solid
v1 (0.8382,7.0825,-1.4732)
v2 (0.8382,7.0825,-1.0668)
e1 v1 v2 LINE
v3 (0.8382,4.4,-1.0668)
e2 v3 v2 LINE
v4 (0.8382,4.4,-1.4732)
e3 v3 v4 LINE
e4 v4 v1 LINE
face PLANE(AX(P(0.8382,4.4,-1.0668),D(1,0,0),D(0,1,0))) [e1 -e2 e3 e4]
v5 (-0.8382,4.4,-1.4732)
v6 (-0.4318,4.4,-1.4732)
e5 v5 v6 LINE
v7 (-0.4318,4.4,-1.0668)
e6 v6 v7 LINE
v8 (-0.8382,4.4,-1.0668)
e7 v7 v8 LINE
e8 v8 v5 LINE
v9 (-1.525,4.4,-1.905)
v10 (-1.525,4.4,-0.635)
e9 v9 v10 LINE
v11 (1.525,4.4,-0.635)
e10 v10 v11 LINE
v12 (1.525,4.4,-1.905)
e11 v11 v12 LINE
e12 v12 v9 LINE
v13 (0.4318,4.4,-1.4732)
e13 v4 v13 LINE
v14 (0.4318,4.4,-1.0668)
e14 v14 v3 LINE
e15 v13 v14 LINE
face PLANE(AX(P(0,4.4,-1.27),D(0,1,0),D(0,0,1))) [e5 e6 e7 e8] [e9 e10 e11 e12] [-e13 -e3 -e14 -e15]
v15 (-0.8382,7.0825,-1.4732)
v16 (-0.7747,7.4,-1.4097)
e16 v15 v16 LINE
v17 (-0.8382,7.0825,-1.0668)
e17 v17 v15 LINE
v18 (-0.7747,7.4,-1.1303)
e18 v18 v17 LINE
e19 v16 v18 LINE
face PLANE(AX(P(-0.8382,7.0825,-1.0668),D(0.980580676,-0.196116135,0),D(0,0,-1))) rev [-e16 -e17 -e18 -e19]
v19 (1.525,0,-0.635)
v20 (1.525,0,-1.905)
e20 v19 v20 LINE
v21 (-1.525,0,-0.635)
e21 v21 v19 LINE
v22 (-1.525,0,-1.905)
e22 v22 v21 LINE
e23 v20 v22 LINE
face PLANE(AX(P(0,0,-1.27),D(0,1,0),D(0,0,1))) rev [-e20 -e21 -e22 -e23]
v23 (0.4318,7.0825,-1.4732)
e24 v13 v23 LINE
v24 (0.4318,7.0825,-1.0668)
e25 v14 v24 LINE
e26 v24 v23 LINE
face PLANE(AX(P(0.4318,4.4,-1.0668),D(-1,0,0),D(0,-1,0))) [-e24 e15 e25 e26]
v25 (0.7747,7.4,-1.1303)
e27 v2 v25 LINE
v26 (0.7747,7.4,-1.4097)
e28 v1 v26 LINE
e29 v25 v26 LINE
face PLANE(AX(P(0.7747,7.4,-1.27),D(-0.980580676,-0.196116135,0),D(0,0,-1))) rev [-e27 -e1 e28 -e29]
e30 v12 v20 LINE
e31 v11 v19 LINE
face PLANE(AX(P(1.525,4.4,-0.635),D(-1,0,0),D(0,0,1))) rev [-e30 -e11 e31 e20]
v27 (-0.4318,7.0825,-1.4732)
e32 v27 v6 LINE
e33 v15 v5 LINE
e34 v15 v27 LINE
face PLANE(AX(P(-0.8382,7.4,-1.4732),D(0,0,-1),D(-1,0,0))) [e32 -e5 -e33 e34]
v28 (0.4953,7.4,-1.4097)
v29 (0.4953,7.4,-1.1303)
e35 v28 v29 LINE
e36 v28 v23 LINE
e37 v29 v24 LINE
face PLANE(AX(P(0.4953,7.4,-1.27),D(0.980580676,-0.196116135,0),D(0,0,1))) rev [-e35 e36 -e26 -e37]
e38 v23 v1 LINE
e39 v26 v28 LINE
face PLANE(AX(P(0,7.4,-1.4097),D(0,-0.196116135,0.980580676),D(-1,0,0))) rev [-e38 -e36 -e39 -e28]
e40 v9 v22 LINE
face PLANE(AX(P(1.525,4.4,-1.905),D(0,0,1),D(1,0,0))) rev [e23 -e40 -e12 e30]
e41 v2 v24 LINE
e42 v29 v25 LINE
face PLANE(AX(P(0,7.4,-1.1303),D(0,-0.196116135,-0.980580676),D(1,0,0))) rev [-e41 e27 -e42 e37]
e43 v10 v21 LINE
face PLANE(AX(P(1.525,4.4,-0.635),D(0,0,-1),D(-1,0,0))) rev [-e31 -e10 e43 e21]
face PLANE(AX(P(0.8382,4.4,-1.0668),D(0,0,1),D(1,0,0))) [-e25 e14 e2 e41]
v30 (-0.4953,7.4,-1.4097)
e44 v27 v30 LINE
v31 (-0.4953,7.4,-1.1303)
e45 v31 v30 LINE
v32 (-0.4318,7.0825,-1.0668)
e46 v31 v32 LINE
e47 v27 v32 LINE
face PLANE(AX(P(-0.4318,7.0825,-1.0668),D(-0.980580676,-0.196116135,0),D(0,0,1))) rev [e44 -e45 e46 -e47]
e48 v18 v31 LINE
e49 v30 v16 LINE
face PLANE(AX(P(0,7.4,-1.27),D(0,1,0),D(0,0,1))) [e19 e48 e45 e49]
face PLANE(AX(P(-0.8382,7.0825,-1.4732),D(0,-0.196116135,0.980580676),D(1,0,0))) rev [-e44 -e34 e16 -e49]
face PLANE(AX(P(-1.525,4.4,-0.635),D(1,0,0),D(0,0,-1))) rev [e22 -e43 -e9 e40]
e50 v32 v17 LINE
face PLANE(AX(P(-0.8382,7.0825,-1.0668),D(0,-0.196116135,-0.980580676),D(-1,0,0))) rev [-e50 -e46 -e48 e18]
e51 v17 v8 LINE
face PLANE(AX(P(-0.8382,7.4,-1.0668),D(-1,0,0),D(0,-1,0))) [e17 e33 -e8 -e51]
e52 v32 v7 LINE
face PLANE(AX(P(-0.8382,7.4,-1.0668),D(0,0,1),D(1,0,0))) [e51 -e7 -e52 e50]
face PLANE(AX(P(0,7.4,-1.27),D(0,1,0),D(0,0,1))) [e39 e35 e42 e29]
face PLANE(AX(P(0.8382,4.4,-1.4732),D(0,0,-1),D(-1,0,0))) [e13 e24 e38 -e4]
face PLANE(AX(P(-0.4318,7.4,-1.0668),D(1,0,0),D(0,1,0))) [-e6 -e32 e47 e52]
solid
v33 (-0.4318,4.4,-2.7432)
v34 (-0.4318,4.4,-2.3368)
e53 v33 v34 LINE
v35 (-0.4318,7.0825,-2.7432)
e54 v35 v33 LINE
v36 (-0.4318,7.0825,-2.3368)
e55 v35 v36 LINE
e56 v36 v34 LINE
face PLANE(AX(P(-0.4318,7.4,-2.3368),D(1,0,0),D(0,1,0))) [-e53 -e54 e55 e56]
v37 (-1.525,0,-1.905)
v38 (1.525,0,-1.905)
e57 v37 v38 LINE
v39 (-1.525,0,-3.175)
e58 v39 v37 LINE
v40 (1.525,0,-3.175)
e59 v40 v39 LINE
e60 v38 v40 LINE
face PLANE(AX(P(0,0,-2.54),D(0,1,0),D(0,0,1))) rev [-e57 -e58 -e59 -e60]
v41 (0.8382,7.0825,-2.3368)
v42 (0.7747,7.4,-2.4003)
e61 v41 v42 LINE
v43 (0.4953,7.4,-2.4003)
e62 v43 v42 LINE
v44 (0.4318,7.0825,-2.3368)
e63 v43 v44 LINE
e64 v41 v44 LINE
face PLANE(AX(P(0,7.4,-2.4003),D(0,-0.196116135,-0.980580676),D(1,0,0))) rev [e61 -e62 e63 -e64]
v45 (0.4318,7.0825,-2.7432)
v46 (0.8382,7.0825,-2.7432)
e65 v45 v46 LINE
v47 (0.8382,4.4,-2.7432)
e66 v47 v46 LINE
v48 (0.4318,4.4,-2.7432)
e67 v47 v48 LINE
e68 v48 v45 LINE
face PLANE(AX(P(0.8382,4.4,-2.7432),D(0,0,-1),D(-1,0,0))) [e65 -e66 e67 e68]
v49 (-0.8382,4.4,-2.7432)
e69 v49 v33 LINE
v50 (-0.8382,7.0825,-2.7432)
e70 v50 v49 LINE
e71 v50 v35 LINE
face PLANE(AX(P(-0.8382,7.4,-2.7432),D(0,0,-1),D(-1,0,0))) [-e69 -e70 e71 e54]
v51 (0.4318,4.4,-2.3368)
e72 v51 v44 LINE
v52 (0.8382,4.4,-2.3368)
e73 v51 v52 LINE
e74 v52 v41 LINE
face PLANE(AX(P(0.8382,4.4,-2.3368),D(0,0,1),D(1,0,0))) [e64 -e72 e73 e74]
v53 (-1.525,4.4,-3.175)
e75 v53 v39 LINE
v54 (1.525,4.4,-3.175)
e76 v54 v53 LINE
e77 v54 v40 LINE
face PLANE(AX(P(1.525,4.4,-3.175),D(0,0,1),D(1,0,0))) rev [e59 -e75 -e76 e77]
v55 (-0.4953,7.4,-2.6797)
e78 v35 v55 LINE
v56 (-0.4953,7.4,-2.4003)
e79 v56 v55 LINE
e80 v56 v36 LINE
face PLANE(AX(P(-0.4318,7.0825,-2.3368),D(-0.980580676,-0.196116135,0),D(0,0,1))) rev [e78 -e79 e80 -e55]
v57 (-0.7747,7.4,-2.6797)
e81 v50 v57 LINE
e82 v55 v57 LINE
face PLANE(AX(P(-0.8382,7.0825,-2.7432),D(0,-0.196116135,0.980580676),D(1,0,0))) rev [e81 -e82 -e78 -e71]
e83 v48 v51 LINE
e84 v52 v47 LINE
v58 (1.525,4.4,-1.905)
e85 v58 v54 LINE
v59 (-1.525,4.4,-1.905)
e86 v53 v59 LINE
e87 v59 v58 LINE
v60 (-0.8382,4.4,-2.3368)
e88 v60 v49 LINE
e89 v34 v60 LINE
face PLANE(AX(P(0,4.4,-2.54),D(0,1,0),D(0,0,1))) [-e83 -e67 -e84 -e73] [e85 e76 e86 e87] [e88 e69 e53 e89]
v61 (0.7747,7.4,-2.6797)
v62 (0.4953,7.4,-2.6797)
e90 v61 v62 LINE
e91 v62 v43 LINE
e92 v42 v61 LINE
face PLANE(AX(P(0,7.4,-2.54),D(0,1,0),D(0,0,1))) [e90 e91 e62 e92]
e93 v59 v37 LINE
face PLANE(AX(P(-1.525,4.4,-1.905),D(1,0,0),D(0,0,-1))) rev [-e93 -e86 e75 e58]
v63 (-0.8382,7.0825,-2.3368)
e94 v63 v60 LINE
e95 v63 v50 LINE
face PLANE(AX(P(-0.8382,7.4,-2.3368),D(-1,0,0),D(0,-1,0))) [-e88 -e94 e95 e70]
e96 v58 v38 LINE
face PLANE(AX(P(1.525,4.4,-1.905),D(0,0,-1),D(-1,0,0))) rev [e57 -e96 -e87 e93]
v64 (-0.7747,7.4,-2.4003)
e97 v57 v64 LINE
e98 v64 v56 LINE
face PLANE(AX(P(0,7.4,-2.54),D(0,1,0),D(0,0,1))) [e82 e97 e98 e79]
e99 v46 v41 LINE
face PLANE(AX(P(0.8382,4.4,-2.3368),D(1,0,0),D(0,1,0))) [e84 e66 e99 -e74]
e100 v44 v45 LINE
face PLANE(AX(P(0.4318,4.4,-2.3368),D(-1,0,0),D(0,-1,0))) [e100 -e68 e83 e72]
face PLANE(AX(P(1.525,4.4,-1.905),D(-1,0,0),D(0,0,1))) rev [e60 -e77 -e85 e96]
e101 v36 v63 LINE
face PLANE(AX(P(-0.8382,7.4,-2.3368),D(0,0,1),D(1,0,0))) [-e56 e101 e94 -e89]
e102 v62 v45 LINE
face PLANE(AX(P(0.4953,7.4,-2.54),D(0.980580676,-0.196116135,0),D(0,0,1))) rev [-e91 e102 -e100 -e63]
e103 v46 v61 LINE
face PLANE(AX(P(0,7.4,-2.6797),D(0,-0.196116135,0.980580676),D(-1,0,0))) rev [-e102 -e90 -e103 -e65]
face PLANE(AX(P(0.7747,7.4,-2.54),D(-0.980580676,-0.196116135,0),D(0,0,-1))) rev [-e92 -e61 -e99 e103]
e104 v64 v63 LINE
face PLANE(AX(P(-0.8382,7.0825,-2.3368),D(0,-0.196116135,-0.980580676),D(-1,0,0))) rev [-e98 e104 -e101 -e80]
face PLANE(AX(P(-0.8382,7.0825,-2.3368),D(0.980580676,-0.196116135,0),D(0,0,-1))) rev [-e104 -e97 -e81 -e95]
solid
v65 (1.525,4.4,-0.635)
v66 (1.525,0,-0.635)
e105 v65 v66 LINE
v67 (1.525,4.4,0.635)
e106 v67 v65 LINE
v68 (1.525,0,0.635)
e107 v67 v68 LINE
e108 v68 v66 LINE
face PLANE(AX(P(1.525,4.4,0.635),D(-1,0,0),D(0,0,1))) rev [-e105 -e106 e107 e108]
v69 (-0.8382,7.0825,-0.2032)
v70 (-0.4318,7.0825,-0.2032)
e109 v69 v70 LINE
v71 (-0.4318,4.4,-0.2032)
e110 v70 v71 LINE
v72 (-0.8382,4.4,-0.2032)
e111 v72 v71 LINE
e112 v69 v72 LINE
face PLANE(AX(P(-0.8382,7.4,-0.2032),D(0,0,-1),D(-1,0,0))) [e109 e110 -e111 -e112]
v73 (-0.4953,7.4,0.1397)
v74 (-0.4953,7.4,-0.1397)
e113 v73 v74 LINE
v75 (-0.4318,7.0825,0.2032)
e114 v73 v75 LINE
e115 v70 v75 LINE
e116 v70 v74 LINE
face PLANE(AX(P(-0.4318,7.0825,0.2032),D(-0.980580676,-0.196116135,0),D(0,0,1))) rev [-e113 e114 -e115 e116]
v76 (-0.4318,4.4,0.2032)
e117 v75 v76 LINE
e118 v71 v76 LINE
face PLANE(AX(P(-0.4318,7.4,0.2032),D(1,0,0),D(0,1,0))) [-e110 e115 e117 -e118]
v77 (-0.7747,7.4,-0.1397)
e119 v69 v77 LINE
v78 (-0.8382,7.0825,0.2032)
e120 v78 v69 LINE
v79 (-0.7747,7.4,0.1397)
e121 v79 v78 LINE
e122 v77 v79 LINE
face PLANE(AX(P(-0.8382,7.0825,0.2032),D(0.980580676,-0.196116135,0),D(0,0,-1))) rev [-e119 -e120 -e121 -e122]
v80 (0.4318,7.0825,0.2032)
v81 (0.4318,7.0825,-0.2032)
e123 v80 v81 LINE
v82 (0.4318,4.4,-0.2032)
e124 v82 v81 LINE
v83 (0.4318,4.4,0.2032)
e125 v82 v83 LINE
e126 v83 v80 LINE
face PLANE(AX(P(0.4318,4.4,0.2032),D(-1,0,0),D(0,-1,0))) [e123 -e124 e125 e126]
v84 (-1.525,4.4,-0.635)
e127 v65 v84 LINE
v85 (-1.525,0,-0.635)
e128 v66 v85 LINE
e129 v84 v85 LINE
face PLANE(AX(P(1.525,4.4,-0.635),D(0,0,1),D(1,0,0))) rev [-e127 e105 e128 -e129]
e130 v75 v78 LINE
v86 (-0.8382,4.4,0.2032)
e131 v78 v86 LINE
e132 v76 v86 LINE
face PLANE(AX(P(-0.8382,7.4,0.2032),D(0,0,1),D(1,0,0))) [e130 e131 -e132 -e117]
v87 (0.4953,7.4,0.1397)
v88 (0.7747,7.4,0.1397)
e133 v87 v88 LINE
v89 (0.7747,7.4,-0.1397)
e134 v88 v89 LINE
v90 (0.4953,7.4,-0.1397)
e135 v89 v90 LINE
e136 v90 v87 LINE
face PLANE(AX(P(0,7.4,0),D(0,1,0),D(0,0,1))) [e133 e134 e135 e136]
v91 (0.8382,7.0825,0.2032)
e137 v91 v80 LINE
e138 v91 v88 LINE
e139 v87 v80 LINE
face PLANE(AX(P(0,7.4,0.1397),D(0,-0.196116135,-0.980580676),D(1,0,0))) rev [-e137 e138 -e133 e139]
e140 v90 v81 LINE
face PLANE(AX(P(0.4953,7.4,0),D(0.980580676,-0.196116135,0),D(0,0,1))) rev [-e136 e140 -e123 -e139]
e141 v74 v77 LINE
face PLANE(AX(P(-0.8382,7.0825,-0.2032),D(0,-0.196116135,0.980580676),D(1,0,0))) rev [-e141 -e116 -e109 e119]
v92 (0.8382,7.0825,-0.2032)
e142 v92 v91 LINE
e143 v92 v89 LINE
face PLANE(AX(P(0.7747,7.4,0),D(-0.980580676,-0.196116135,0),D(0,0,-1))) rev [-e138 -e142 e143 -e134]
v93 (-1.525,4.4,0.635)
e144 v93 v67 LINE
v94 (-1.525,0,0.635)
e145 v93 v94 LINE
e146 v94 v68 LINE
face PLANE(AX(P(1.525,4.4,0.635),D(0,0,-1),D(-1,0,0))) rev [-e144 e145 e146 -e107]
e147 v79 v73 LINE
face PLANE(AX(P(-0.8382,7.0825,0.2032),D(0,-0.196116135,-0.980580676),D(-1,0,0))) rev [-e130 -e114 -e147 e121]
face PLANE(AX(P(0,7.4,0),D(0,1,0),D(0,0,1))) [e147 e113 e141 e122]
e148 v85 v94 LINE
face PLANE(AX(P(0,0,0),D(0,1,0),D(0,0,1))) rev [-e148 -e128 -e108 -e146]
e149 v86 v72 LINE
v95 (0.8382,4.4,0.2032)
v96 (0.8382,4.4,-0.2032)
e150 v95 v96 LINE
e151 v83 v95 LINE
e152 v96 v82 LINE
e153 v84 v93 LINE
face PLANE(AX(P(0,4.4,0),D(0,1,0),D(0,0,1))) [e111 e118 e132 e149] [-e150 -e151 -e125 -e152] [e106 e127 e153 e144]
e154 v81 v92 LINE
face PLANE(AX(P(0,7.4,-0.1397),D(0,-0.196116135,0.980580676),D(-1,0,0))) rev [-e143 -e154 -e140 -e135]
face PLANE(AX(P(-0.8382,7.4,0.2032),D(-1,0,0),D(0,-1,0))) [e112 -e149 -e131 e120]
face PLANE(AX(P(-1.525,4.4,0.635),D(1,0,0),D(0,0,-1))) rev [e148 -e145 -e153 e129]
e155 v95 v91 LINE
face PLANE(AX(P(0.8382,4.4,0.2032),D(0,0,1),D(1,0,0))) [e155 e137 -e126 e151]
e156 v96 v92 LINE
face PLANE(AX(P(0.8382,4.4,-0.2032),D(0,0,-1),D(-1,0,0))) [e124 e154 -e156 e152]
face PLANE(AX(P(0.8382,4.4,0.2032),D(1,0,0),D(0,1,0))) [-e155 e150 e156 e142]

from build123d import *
from OCP.BRepFilletAPI import BRepFilletAPI_MakeChamfer

# Parameters (mm, degrees)
SKETCH1_W           = 3.05
SKETCH1_H           = 1.27
BOSS_EXTRUDE2_DEPTH = 4.4
SWEEP5_START        = 4.4
SWEEP5_OUTLINE_W    = 0.4064
SWEEP5_OUTLINE_H    = 0.4064
SWEEP5_DEPTH        = 3
SKETCH6_W           = 0.4064
SKETCH6_H           = 0.4064
CHAMFER1_SIZE       = 0.0635
CHAMFER1_SIZE2      = 0.3175
CHAMFER2_SIZE       = 0.3175
CHAMFER2_SIZE2      = 0.0635
LPATTERN1_COUNT     = 3
LPATTERN1_PITCH     = 1.27


# Read off the part's stored shape, not the designer's step: Sweep5
with BuildPart() as part:
    # Sketch1 → Boss-Extrude2 (new body)
    with BuildSketch(Plane(origin=(0, 0, 0), x_dir=(1, 0, 0), z_dir=(0, 1, 0))):
        Rectangle(SKETCH1_W, SKETCH1_H)
    extrude(amount=BOSS_EXTRUDE2_DEPTH)

    # Sweep5 outline → Sweep5 (add)
    with BuildSketch(Plane(origin=(0, 0, 0), x_dir=(1, 0, 0), z_dir=(0, 1, 0)).offset(SWEEP5_START)):
        with Locations((-0.635, 0)):
            Rectangle(SWEEP5_OUTLINE_W, SWEEP5_OUTLINE_H)
    extrude(amount=SWEEP5_DEPTH)

    # Sweep6: sweep along a path in Sketch7
    with BuildLine(Plane.XY) as sweep6_path:
        Line((0.635, 4.4), (0.635, 7.4))
    # Sketch6 → Sweep6 (sweep)
    with BuildSketch(Plane(origin=(0, 7.4, 0), x_dir=(1, 0, 0), z_dir=(0, 1, 0))):
        with Locations((0.635, 0)):
            Rectangle(SKETCH6_W, SKETCH6_H)
    sweep(path=sweep6_path.line)

    # Chamfer1
    chamfer1_edges = [part.edges().sort_by_distance(p)[0] for p in [
        (-0.635, 7.4, -0.2032),
        (-0.4318, 7.4, 0),
        (-0.635, 7.4, 0.2032),
        (-0.8382, 7.4, 0),
    ]]
    chamfer1_side = [part.faces().sort_by_distance(p)[0] for p in [
        (-0.635, 7.4, 0),
    ]]
    chamfer(chamfer1_edges, length=CHAMFER1_SIZE, length2=CHAMFER1_SIZE2, reference=chamfer1_side[0])

    # Chamfer2: one chamfer whose edges measure the first distance from different faces: ONE call of the kernel's chamfer builder (chamfer() names one face for all edges)
    chamfer2_edges_1 = [part.edges().sort_by_distance(p)[0] for p in [
        (0.8382, 7.4, 0),
    ]]
    chamfer2_side_1 = [part.faces().sort_by_distance(p)[0] for p in [
        (0.8382, 5.9, 0),
    ]]
    chamfer2_edges_2 = [part.edges().sort_by_distance(p)[0] for p in [
        (0.635, 7.4, -0.2032),
    ]]
    chamfer2_side_2 = [part.faces().sort_by_distance(p)[0] for p in [
        (0.635, 5.9, -0.2032),
    ]]
    chamfer2_edges_3 = [part.edges().sort_by_distance(p)[0] for p in [
        (0.4318, 7.4, 0),
    ]]
    chamfer2_side_3 = [part.faces().sort_by_distance(p)[0] for p in [
        (0.4318, 5.9, 0),
    ]]
    chamfer2_edges_4 = [part.edges().sort_by_distance(p)[0] for p in [
        (0.635, 7.4, 0.2032),
    ]]
    chamfer2_side_4 = [part.faces().sort_by_distance(p)[0] for p in [
        (0.635, 5.9, 0.2032),
    ]]
    chamfer2 = BRepFilletAPI_MakeChamfer(part.part.solid().wrapped)
    for e in chamfer2_edges_1:
        chamfer2.Add(CHAMFER2_SIZE, CHAMFER2_SIZE2, e.wrapped, chamfer2_side_1[0].wrapped)  # the first distance lies on this face
    for e in chamfer2_edges_2:
        chamfer2.Add(CHAMFER2_SIZE, CHAMFER2_SIZE2, e.wrapped, chamfer2_side_2[0].wrapped)  # the first distance lies on this face
    for e in chamfer2_edges_3:
        chamfer2.Add(CHAMFER2_SIZE, CHAMFER2_SIZE2, e.wrapped, chamfer2_side_3[0].wrapped)  # the first distance lies on this face
    for e in chamfer2_edges_4:
        chamfer2.Add(CHAMFER2_SIZE, CHAMFER2_SIZE2, e.wrapped, chamfer2_side_4[0].wrapped)  # the first distance lies on this face
    add(Compound.cast(chamfer2.Shape()), mode=Mode.REPLACE)


with BuildPart() as lpattern1_1:
    # LPattern1: pattern copy
    add(part.part.moved(Location(Vector(0, 0, -1) * (1 * LPATTERN1_PITCH))))


with BuildPart() as lpattern1_2:
    # LPattern1: pattern copy
    add(part.part.moved(Location(Vector(0, 0, -1) * (2 * LPATTERN1_PITCH))))


solid = Compound([part.part, lpattern1_1.part, lpattern1_2.part])
